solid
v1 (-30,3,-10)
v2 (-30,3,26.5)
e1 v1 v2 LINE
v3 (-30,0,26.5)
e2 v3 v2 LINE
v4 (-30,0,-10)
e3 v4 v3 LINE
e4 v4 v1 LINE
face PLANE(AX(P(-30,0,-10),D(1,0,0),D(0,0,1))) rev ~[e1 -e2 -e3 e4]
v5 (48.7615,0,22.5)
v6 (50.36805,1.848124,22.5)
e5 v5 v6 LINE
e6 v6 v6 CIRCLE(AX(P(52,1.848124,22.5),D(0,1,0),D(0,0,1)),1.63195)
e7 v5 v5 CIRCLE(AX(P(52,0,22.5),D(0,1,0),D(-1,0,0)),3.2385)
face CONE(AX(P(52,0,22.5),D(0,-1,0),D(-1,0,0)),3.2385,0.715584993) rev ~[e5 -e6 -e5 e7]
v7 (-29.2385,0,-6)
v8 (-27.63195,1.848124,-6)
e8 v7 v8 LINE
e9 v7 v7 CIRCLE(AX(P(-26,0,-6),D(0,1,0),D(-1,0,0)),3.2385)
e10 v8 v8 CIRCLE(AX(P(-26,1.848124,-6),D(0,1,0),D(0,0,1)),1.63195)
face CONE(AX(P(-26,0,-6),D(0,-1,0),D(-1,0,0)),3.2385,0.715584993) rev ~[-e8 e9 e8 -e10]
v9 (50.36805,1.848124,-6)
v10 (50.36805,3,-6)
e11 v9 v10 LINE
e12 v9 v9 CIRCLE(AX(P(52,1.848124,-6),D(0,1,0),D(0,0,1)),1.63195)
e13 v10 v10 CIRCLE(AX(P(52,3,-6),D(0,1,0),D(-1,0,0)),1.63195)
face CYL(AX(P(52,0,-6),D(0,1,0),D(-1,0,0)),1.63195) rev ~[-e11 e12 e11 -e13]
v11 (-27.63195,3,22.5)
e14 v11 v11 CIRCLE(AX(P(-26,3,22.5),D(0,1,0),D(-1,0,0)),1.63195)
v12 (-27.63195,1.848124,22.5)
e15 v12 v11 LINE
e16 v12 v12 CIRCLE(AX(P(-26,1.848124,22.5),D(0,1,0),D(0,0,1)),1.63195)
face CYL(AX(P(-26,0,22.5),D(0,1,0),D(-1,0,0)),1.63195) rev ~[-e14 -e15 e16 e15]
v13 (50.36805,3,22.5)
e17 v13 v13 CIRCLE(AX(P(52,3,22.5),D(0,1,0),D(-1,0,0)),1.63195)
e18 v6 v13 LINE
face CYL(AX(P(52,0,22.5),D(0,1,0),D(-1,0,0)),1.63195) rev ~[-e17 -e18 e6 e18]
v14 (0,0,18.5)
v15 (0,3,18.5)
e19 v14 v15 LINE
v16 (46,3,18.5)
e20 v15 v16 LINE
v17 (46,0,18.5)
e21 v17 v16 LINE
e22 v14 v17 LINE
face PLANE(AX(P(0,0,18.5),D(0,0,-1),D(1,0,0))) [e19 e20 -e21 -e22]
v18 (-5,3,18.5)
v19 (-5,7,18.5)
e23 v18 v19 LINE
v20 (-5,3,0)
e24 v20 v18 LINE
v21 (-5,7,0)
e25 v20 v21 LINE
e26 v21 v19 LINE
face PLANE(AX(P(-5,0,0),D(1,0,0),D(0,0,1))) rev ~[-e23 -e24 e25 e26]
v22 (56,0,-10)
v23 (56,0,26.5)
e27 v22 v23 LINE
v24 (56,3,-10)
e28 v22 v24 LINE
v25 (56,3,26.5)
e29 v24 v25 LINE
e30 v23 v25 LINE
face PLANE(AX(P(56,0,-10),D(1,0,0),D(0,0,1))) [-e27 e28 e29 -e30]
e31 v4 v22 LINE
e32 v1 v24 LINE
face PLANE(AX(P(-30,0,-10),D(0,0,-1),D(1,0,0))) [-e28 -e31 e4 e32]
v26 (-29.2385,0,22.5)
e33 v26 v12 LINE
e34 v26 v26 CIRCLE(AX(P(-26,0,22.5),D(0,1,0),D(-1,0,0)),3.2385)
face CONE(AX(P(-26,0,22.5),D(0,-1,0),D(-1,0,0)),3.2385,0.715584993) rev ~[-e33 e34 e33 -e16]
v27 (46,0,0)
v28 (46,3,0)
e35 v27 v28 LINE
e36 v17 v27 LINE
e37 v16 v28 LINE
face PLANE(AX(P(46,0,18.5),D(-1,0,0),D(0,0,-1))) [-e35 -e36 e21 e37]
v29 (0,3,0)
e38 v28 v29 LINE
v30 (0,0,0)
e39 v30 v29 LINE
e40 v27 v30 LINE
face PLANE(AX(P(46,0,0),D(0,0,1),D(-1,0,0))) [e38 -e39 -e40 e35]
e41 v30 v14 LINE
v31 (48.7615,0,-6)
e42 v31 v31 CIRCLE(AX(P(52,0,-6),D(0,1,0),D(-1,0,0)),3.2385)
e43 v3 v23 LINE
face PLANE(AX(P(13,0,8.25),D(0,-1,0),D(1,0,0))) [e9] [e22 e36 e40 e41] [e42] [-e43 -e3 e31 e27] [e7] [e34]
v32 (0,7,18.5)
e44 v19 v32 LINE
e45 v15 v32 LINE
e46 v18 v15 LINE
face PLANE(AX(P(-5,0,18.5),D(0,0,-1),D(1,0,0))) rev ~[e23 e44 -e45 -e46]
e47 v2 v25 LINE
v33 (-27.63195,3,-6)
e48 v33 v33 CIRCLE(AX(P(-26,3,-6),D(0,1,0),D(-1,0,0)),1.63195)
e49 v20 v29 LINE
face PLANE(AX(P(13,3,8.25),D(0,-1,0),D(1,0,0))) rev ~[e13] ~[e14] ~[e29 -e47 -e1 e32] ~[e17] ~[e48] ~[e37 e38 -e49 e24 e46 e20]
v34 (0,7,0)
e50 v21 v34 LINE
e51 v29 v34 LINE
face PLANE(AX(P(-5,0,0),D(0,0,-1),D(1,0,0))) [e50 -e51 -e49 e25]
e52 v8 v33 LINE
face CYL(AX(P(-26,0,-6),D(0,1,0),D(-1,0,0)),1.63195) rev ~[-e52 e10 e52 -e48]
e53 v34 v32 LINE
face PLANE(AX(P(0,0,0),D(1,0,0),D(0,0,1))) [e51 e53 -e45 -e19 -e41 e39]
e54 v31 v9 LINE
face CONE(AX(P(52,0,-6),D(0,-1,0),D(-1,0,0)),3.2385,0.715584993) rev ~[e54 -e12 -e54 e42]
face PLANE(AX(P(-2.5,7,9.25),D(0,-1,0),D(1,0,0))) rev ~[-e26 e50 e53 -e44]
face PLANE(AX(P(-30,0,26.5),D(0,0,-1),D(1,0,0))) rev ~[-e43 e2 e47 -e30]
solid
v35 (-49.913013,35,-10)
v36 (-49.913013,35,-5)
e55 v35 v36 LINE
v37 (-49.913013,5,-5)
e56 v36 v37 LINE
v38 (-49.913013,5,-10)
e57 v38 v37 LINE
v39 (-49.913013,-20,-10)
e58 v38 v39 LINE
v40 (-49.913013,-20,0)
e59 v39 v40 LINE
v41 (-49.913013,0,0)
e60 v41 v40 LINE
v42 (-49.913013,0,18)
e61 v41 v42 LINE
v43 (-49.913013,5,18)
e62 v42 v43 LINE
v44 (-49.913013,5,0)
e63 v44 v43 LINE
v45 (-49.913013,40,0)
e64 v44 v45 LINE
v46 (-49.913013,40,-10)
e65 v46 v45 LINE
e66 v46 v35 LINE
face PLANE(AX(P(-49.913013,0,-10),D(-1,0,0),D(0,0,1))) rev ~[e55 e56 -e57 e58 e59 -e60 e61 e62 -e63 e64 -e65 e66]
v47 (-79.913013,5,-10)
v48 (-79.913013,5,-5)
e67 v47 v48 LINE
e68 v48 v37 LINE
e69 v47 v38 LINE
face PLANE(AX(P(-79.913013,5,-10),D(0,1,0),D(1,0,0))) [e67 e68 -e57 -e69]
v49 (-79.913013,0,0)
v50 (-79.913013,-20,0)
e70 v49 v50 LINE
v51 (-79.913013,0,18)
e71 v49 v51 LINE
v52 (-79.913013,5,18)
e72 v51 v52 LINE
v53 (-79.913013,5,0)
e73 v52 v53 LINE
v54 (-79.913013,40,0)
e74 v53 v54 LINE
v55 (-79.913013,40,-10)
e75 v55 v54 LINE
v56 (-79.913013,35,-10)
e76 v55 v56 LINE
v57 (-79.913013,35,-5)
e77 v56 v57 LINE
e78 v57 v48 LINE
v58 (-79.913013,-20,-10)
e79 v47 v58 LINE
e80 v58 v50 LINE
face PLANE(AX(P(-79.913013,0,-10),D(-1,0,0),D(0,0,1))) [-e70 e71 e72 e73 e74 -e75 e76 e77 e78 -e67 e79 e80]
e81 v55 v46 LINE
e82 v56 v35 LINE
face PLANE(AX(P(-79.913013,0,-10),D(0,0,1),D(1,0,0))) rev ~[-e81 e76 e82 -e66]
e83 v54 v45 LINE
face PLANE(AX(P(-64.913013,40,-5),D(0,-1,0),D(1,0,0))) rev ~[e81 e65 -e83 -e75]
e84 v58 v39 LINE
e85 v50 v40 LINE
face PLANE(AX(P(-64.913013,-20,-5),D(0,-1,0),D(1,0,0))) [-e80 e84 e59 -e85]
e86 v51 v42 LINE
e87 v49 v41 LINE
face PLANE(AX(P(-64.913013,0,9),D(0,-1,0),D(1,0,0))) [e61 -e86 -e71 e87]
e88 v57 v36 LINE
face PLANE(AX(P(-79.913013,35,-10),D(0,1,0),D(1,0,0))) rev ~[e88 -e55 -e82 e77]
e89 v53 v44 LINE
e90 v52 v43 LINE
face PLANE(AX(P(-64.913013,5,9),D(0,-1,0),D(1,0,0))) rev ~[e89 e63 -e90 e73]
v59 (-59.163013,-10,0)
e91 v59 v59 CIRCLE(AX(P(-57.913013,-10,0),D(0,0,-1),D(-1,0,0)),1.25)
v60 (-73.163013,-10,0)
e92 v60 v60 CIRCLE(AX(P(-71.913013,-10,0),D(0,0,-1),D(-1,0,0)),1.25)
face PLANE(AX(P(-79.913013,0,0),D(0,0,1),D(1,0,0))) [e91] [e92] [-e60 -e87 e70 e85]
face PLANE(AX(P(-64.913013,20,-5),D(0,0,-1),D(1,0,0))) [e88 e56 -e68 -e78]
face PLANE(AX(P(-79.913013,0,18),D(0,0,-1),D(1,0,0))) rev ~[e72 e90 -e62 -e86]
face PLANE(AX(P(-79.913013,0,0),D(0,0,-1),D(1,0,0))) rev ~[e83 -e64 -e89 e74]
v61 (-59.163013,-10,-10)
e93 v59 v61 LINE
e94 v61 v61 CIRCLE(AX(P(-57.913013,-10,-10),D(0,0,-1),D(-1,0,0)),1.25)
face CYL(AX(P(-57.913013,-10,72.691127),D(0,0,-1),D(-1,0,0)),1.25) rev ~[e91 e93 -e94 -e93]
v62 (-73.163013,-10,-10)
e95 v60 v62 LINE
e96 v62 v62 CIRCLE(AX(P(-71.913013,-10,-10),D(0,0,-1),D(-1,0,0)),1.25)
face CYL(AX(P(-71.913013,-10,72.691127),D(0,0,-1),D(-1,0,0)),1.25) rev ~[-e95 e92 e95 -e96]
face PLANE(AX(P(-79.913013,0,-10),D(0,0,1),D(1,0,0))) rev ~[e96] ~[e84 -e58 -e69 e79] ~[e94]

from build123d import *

# Parameters (mm, degrees)
F0_W           = 86
F0_H           = 36.5
F0_W_2         = 5
F0_H_2         = 18.5
F1_DEPTH       = 3
F2_D           = 3.2639
F2_CSINK_D     = 6.477
F2_CSINK_ANGLE = 82
F3_W           = 30
F3_H           = 18
F3_H_2         = 10
F4_DEPTH       = 5
F5_DEPTH       = 40
F5_DEPTH_BACK  = 20
F6_W           = 30
F6_H           = 30
F7_DEPTH       = 5
F9_D           = 2.5
F10_DEPTH      = 7


# Not quite as in the source:
# - a feature names something its author has since deleted; it is built from what else it names


with BuildPart() as f1:
    # F0 (on Front) → F1 (new body)
    with BuildSketch(Plane.XZ):
        with Locations((13, 8.25)):
            Rectangle(F0_W, F0_H)
        Polygon((-5, 18.5), (0, 18.5), (46, 18.5), (46, 0), (0, 0), (-5, 0), align=None, mode=Mode.SUBTRACT)
        with Locations((-2.5, 9.25)):
            Rectangle(F0_W_2, F0_H_2)
    extrude(amount=-F1_DEPTH)

    # F2 (through all)
    with Locations(Plane.XZ):
        with Locations((-26, 22.5), (52, 22.5), (52, -6), (-26, -6)):
            CounterSinkHole(F2_D / 2, F2_CSINK_D / 2, counter_sink_angle=F2_CSINK_ANGLE)

    # F0 (on Front) → F10 (join)
    with BuildSketch(Plane.XZ):
        with Locations((-2.5, 9.25)):
            Rectangle(F0_W_2, F0_H_2)
    extrude(amount=-F10_DEPTH)


with BuildPart() as f4:
    # F3 (on Front) → F4 (new body)
    with BuildSketch(Plane.XZ):
        with Locations((-64.9130126834, 9)):
            Rectangle(F3_W, F3_H)
        with Locations((-64.9130126834, -5)):
            Rectangle(F3_W, F3_H_2)
    extrude(amount=-F4_DEPTH)

    # F3 (on Front) → F5 (join, two sides)
    with BuildSketch(Plane.XZ) as f5_sk:
        with Locations((-64.9130126834, -5)):
            Rectangle(F3_W, F3_H_2)
    extrude(amount=-F5_DEPTH)
    extrude(f5_sk.sketch, amount=F5_DEPTH_BACK)

    # F6 (on face) → F7 (cut)
    with BuildSketch(Plane(origin=(0, 0, -10), x_dir=(1, 0, 0), z_dir=(0, 0, -1))):
        with Locations((-64.9130126834, -20)):
            Rectangle(F6_W, F6_H)
    extrude(amount=-F7_DEPTH, mode=Mode.SUBTRACT)

    # F9 (through all)
    with Locations(Plane.XY):
        with Locations((-71.9130126834, -10), (-57.9130126834, -10)):
            Hole(F9_D / 2)


solid = Compound([f1.part, f4.part])
